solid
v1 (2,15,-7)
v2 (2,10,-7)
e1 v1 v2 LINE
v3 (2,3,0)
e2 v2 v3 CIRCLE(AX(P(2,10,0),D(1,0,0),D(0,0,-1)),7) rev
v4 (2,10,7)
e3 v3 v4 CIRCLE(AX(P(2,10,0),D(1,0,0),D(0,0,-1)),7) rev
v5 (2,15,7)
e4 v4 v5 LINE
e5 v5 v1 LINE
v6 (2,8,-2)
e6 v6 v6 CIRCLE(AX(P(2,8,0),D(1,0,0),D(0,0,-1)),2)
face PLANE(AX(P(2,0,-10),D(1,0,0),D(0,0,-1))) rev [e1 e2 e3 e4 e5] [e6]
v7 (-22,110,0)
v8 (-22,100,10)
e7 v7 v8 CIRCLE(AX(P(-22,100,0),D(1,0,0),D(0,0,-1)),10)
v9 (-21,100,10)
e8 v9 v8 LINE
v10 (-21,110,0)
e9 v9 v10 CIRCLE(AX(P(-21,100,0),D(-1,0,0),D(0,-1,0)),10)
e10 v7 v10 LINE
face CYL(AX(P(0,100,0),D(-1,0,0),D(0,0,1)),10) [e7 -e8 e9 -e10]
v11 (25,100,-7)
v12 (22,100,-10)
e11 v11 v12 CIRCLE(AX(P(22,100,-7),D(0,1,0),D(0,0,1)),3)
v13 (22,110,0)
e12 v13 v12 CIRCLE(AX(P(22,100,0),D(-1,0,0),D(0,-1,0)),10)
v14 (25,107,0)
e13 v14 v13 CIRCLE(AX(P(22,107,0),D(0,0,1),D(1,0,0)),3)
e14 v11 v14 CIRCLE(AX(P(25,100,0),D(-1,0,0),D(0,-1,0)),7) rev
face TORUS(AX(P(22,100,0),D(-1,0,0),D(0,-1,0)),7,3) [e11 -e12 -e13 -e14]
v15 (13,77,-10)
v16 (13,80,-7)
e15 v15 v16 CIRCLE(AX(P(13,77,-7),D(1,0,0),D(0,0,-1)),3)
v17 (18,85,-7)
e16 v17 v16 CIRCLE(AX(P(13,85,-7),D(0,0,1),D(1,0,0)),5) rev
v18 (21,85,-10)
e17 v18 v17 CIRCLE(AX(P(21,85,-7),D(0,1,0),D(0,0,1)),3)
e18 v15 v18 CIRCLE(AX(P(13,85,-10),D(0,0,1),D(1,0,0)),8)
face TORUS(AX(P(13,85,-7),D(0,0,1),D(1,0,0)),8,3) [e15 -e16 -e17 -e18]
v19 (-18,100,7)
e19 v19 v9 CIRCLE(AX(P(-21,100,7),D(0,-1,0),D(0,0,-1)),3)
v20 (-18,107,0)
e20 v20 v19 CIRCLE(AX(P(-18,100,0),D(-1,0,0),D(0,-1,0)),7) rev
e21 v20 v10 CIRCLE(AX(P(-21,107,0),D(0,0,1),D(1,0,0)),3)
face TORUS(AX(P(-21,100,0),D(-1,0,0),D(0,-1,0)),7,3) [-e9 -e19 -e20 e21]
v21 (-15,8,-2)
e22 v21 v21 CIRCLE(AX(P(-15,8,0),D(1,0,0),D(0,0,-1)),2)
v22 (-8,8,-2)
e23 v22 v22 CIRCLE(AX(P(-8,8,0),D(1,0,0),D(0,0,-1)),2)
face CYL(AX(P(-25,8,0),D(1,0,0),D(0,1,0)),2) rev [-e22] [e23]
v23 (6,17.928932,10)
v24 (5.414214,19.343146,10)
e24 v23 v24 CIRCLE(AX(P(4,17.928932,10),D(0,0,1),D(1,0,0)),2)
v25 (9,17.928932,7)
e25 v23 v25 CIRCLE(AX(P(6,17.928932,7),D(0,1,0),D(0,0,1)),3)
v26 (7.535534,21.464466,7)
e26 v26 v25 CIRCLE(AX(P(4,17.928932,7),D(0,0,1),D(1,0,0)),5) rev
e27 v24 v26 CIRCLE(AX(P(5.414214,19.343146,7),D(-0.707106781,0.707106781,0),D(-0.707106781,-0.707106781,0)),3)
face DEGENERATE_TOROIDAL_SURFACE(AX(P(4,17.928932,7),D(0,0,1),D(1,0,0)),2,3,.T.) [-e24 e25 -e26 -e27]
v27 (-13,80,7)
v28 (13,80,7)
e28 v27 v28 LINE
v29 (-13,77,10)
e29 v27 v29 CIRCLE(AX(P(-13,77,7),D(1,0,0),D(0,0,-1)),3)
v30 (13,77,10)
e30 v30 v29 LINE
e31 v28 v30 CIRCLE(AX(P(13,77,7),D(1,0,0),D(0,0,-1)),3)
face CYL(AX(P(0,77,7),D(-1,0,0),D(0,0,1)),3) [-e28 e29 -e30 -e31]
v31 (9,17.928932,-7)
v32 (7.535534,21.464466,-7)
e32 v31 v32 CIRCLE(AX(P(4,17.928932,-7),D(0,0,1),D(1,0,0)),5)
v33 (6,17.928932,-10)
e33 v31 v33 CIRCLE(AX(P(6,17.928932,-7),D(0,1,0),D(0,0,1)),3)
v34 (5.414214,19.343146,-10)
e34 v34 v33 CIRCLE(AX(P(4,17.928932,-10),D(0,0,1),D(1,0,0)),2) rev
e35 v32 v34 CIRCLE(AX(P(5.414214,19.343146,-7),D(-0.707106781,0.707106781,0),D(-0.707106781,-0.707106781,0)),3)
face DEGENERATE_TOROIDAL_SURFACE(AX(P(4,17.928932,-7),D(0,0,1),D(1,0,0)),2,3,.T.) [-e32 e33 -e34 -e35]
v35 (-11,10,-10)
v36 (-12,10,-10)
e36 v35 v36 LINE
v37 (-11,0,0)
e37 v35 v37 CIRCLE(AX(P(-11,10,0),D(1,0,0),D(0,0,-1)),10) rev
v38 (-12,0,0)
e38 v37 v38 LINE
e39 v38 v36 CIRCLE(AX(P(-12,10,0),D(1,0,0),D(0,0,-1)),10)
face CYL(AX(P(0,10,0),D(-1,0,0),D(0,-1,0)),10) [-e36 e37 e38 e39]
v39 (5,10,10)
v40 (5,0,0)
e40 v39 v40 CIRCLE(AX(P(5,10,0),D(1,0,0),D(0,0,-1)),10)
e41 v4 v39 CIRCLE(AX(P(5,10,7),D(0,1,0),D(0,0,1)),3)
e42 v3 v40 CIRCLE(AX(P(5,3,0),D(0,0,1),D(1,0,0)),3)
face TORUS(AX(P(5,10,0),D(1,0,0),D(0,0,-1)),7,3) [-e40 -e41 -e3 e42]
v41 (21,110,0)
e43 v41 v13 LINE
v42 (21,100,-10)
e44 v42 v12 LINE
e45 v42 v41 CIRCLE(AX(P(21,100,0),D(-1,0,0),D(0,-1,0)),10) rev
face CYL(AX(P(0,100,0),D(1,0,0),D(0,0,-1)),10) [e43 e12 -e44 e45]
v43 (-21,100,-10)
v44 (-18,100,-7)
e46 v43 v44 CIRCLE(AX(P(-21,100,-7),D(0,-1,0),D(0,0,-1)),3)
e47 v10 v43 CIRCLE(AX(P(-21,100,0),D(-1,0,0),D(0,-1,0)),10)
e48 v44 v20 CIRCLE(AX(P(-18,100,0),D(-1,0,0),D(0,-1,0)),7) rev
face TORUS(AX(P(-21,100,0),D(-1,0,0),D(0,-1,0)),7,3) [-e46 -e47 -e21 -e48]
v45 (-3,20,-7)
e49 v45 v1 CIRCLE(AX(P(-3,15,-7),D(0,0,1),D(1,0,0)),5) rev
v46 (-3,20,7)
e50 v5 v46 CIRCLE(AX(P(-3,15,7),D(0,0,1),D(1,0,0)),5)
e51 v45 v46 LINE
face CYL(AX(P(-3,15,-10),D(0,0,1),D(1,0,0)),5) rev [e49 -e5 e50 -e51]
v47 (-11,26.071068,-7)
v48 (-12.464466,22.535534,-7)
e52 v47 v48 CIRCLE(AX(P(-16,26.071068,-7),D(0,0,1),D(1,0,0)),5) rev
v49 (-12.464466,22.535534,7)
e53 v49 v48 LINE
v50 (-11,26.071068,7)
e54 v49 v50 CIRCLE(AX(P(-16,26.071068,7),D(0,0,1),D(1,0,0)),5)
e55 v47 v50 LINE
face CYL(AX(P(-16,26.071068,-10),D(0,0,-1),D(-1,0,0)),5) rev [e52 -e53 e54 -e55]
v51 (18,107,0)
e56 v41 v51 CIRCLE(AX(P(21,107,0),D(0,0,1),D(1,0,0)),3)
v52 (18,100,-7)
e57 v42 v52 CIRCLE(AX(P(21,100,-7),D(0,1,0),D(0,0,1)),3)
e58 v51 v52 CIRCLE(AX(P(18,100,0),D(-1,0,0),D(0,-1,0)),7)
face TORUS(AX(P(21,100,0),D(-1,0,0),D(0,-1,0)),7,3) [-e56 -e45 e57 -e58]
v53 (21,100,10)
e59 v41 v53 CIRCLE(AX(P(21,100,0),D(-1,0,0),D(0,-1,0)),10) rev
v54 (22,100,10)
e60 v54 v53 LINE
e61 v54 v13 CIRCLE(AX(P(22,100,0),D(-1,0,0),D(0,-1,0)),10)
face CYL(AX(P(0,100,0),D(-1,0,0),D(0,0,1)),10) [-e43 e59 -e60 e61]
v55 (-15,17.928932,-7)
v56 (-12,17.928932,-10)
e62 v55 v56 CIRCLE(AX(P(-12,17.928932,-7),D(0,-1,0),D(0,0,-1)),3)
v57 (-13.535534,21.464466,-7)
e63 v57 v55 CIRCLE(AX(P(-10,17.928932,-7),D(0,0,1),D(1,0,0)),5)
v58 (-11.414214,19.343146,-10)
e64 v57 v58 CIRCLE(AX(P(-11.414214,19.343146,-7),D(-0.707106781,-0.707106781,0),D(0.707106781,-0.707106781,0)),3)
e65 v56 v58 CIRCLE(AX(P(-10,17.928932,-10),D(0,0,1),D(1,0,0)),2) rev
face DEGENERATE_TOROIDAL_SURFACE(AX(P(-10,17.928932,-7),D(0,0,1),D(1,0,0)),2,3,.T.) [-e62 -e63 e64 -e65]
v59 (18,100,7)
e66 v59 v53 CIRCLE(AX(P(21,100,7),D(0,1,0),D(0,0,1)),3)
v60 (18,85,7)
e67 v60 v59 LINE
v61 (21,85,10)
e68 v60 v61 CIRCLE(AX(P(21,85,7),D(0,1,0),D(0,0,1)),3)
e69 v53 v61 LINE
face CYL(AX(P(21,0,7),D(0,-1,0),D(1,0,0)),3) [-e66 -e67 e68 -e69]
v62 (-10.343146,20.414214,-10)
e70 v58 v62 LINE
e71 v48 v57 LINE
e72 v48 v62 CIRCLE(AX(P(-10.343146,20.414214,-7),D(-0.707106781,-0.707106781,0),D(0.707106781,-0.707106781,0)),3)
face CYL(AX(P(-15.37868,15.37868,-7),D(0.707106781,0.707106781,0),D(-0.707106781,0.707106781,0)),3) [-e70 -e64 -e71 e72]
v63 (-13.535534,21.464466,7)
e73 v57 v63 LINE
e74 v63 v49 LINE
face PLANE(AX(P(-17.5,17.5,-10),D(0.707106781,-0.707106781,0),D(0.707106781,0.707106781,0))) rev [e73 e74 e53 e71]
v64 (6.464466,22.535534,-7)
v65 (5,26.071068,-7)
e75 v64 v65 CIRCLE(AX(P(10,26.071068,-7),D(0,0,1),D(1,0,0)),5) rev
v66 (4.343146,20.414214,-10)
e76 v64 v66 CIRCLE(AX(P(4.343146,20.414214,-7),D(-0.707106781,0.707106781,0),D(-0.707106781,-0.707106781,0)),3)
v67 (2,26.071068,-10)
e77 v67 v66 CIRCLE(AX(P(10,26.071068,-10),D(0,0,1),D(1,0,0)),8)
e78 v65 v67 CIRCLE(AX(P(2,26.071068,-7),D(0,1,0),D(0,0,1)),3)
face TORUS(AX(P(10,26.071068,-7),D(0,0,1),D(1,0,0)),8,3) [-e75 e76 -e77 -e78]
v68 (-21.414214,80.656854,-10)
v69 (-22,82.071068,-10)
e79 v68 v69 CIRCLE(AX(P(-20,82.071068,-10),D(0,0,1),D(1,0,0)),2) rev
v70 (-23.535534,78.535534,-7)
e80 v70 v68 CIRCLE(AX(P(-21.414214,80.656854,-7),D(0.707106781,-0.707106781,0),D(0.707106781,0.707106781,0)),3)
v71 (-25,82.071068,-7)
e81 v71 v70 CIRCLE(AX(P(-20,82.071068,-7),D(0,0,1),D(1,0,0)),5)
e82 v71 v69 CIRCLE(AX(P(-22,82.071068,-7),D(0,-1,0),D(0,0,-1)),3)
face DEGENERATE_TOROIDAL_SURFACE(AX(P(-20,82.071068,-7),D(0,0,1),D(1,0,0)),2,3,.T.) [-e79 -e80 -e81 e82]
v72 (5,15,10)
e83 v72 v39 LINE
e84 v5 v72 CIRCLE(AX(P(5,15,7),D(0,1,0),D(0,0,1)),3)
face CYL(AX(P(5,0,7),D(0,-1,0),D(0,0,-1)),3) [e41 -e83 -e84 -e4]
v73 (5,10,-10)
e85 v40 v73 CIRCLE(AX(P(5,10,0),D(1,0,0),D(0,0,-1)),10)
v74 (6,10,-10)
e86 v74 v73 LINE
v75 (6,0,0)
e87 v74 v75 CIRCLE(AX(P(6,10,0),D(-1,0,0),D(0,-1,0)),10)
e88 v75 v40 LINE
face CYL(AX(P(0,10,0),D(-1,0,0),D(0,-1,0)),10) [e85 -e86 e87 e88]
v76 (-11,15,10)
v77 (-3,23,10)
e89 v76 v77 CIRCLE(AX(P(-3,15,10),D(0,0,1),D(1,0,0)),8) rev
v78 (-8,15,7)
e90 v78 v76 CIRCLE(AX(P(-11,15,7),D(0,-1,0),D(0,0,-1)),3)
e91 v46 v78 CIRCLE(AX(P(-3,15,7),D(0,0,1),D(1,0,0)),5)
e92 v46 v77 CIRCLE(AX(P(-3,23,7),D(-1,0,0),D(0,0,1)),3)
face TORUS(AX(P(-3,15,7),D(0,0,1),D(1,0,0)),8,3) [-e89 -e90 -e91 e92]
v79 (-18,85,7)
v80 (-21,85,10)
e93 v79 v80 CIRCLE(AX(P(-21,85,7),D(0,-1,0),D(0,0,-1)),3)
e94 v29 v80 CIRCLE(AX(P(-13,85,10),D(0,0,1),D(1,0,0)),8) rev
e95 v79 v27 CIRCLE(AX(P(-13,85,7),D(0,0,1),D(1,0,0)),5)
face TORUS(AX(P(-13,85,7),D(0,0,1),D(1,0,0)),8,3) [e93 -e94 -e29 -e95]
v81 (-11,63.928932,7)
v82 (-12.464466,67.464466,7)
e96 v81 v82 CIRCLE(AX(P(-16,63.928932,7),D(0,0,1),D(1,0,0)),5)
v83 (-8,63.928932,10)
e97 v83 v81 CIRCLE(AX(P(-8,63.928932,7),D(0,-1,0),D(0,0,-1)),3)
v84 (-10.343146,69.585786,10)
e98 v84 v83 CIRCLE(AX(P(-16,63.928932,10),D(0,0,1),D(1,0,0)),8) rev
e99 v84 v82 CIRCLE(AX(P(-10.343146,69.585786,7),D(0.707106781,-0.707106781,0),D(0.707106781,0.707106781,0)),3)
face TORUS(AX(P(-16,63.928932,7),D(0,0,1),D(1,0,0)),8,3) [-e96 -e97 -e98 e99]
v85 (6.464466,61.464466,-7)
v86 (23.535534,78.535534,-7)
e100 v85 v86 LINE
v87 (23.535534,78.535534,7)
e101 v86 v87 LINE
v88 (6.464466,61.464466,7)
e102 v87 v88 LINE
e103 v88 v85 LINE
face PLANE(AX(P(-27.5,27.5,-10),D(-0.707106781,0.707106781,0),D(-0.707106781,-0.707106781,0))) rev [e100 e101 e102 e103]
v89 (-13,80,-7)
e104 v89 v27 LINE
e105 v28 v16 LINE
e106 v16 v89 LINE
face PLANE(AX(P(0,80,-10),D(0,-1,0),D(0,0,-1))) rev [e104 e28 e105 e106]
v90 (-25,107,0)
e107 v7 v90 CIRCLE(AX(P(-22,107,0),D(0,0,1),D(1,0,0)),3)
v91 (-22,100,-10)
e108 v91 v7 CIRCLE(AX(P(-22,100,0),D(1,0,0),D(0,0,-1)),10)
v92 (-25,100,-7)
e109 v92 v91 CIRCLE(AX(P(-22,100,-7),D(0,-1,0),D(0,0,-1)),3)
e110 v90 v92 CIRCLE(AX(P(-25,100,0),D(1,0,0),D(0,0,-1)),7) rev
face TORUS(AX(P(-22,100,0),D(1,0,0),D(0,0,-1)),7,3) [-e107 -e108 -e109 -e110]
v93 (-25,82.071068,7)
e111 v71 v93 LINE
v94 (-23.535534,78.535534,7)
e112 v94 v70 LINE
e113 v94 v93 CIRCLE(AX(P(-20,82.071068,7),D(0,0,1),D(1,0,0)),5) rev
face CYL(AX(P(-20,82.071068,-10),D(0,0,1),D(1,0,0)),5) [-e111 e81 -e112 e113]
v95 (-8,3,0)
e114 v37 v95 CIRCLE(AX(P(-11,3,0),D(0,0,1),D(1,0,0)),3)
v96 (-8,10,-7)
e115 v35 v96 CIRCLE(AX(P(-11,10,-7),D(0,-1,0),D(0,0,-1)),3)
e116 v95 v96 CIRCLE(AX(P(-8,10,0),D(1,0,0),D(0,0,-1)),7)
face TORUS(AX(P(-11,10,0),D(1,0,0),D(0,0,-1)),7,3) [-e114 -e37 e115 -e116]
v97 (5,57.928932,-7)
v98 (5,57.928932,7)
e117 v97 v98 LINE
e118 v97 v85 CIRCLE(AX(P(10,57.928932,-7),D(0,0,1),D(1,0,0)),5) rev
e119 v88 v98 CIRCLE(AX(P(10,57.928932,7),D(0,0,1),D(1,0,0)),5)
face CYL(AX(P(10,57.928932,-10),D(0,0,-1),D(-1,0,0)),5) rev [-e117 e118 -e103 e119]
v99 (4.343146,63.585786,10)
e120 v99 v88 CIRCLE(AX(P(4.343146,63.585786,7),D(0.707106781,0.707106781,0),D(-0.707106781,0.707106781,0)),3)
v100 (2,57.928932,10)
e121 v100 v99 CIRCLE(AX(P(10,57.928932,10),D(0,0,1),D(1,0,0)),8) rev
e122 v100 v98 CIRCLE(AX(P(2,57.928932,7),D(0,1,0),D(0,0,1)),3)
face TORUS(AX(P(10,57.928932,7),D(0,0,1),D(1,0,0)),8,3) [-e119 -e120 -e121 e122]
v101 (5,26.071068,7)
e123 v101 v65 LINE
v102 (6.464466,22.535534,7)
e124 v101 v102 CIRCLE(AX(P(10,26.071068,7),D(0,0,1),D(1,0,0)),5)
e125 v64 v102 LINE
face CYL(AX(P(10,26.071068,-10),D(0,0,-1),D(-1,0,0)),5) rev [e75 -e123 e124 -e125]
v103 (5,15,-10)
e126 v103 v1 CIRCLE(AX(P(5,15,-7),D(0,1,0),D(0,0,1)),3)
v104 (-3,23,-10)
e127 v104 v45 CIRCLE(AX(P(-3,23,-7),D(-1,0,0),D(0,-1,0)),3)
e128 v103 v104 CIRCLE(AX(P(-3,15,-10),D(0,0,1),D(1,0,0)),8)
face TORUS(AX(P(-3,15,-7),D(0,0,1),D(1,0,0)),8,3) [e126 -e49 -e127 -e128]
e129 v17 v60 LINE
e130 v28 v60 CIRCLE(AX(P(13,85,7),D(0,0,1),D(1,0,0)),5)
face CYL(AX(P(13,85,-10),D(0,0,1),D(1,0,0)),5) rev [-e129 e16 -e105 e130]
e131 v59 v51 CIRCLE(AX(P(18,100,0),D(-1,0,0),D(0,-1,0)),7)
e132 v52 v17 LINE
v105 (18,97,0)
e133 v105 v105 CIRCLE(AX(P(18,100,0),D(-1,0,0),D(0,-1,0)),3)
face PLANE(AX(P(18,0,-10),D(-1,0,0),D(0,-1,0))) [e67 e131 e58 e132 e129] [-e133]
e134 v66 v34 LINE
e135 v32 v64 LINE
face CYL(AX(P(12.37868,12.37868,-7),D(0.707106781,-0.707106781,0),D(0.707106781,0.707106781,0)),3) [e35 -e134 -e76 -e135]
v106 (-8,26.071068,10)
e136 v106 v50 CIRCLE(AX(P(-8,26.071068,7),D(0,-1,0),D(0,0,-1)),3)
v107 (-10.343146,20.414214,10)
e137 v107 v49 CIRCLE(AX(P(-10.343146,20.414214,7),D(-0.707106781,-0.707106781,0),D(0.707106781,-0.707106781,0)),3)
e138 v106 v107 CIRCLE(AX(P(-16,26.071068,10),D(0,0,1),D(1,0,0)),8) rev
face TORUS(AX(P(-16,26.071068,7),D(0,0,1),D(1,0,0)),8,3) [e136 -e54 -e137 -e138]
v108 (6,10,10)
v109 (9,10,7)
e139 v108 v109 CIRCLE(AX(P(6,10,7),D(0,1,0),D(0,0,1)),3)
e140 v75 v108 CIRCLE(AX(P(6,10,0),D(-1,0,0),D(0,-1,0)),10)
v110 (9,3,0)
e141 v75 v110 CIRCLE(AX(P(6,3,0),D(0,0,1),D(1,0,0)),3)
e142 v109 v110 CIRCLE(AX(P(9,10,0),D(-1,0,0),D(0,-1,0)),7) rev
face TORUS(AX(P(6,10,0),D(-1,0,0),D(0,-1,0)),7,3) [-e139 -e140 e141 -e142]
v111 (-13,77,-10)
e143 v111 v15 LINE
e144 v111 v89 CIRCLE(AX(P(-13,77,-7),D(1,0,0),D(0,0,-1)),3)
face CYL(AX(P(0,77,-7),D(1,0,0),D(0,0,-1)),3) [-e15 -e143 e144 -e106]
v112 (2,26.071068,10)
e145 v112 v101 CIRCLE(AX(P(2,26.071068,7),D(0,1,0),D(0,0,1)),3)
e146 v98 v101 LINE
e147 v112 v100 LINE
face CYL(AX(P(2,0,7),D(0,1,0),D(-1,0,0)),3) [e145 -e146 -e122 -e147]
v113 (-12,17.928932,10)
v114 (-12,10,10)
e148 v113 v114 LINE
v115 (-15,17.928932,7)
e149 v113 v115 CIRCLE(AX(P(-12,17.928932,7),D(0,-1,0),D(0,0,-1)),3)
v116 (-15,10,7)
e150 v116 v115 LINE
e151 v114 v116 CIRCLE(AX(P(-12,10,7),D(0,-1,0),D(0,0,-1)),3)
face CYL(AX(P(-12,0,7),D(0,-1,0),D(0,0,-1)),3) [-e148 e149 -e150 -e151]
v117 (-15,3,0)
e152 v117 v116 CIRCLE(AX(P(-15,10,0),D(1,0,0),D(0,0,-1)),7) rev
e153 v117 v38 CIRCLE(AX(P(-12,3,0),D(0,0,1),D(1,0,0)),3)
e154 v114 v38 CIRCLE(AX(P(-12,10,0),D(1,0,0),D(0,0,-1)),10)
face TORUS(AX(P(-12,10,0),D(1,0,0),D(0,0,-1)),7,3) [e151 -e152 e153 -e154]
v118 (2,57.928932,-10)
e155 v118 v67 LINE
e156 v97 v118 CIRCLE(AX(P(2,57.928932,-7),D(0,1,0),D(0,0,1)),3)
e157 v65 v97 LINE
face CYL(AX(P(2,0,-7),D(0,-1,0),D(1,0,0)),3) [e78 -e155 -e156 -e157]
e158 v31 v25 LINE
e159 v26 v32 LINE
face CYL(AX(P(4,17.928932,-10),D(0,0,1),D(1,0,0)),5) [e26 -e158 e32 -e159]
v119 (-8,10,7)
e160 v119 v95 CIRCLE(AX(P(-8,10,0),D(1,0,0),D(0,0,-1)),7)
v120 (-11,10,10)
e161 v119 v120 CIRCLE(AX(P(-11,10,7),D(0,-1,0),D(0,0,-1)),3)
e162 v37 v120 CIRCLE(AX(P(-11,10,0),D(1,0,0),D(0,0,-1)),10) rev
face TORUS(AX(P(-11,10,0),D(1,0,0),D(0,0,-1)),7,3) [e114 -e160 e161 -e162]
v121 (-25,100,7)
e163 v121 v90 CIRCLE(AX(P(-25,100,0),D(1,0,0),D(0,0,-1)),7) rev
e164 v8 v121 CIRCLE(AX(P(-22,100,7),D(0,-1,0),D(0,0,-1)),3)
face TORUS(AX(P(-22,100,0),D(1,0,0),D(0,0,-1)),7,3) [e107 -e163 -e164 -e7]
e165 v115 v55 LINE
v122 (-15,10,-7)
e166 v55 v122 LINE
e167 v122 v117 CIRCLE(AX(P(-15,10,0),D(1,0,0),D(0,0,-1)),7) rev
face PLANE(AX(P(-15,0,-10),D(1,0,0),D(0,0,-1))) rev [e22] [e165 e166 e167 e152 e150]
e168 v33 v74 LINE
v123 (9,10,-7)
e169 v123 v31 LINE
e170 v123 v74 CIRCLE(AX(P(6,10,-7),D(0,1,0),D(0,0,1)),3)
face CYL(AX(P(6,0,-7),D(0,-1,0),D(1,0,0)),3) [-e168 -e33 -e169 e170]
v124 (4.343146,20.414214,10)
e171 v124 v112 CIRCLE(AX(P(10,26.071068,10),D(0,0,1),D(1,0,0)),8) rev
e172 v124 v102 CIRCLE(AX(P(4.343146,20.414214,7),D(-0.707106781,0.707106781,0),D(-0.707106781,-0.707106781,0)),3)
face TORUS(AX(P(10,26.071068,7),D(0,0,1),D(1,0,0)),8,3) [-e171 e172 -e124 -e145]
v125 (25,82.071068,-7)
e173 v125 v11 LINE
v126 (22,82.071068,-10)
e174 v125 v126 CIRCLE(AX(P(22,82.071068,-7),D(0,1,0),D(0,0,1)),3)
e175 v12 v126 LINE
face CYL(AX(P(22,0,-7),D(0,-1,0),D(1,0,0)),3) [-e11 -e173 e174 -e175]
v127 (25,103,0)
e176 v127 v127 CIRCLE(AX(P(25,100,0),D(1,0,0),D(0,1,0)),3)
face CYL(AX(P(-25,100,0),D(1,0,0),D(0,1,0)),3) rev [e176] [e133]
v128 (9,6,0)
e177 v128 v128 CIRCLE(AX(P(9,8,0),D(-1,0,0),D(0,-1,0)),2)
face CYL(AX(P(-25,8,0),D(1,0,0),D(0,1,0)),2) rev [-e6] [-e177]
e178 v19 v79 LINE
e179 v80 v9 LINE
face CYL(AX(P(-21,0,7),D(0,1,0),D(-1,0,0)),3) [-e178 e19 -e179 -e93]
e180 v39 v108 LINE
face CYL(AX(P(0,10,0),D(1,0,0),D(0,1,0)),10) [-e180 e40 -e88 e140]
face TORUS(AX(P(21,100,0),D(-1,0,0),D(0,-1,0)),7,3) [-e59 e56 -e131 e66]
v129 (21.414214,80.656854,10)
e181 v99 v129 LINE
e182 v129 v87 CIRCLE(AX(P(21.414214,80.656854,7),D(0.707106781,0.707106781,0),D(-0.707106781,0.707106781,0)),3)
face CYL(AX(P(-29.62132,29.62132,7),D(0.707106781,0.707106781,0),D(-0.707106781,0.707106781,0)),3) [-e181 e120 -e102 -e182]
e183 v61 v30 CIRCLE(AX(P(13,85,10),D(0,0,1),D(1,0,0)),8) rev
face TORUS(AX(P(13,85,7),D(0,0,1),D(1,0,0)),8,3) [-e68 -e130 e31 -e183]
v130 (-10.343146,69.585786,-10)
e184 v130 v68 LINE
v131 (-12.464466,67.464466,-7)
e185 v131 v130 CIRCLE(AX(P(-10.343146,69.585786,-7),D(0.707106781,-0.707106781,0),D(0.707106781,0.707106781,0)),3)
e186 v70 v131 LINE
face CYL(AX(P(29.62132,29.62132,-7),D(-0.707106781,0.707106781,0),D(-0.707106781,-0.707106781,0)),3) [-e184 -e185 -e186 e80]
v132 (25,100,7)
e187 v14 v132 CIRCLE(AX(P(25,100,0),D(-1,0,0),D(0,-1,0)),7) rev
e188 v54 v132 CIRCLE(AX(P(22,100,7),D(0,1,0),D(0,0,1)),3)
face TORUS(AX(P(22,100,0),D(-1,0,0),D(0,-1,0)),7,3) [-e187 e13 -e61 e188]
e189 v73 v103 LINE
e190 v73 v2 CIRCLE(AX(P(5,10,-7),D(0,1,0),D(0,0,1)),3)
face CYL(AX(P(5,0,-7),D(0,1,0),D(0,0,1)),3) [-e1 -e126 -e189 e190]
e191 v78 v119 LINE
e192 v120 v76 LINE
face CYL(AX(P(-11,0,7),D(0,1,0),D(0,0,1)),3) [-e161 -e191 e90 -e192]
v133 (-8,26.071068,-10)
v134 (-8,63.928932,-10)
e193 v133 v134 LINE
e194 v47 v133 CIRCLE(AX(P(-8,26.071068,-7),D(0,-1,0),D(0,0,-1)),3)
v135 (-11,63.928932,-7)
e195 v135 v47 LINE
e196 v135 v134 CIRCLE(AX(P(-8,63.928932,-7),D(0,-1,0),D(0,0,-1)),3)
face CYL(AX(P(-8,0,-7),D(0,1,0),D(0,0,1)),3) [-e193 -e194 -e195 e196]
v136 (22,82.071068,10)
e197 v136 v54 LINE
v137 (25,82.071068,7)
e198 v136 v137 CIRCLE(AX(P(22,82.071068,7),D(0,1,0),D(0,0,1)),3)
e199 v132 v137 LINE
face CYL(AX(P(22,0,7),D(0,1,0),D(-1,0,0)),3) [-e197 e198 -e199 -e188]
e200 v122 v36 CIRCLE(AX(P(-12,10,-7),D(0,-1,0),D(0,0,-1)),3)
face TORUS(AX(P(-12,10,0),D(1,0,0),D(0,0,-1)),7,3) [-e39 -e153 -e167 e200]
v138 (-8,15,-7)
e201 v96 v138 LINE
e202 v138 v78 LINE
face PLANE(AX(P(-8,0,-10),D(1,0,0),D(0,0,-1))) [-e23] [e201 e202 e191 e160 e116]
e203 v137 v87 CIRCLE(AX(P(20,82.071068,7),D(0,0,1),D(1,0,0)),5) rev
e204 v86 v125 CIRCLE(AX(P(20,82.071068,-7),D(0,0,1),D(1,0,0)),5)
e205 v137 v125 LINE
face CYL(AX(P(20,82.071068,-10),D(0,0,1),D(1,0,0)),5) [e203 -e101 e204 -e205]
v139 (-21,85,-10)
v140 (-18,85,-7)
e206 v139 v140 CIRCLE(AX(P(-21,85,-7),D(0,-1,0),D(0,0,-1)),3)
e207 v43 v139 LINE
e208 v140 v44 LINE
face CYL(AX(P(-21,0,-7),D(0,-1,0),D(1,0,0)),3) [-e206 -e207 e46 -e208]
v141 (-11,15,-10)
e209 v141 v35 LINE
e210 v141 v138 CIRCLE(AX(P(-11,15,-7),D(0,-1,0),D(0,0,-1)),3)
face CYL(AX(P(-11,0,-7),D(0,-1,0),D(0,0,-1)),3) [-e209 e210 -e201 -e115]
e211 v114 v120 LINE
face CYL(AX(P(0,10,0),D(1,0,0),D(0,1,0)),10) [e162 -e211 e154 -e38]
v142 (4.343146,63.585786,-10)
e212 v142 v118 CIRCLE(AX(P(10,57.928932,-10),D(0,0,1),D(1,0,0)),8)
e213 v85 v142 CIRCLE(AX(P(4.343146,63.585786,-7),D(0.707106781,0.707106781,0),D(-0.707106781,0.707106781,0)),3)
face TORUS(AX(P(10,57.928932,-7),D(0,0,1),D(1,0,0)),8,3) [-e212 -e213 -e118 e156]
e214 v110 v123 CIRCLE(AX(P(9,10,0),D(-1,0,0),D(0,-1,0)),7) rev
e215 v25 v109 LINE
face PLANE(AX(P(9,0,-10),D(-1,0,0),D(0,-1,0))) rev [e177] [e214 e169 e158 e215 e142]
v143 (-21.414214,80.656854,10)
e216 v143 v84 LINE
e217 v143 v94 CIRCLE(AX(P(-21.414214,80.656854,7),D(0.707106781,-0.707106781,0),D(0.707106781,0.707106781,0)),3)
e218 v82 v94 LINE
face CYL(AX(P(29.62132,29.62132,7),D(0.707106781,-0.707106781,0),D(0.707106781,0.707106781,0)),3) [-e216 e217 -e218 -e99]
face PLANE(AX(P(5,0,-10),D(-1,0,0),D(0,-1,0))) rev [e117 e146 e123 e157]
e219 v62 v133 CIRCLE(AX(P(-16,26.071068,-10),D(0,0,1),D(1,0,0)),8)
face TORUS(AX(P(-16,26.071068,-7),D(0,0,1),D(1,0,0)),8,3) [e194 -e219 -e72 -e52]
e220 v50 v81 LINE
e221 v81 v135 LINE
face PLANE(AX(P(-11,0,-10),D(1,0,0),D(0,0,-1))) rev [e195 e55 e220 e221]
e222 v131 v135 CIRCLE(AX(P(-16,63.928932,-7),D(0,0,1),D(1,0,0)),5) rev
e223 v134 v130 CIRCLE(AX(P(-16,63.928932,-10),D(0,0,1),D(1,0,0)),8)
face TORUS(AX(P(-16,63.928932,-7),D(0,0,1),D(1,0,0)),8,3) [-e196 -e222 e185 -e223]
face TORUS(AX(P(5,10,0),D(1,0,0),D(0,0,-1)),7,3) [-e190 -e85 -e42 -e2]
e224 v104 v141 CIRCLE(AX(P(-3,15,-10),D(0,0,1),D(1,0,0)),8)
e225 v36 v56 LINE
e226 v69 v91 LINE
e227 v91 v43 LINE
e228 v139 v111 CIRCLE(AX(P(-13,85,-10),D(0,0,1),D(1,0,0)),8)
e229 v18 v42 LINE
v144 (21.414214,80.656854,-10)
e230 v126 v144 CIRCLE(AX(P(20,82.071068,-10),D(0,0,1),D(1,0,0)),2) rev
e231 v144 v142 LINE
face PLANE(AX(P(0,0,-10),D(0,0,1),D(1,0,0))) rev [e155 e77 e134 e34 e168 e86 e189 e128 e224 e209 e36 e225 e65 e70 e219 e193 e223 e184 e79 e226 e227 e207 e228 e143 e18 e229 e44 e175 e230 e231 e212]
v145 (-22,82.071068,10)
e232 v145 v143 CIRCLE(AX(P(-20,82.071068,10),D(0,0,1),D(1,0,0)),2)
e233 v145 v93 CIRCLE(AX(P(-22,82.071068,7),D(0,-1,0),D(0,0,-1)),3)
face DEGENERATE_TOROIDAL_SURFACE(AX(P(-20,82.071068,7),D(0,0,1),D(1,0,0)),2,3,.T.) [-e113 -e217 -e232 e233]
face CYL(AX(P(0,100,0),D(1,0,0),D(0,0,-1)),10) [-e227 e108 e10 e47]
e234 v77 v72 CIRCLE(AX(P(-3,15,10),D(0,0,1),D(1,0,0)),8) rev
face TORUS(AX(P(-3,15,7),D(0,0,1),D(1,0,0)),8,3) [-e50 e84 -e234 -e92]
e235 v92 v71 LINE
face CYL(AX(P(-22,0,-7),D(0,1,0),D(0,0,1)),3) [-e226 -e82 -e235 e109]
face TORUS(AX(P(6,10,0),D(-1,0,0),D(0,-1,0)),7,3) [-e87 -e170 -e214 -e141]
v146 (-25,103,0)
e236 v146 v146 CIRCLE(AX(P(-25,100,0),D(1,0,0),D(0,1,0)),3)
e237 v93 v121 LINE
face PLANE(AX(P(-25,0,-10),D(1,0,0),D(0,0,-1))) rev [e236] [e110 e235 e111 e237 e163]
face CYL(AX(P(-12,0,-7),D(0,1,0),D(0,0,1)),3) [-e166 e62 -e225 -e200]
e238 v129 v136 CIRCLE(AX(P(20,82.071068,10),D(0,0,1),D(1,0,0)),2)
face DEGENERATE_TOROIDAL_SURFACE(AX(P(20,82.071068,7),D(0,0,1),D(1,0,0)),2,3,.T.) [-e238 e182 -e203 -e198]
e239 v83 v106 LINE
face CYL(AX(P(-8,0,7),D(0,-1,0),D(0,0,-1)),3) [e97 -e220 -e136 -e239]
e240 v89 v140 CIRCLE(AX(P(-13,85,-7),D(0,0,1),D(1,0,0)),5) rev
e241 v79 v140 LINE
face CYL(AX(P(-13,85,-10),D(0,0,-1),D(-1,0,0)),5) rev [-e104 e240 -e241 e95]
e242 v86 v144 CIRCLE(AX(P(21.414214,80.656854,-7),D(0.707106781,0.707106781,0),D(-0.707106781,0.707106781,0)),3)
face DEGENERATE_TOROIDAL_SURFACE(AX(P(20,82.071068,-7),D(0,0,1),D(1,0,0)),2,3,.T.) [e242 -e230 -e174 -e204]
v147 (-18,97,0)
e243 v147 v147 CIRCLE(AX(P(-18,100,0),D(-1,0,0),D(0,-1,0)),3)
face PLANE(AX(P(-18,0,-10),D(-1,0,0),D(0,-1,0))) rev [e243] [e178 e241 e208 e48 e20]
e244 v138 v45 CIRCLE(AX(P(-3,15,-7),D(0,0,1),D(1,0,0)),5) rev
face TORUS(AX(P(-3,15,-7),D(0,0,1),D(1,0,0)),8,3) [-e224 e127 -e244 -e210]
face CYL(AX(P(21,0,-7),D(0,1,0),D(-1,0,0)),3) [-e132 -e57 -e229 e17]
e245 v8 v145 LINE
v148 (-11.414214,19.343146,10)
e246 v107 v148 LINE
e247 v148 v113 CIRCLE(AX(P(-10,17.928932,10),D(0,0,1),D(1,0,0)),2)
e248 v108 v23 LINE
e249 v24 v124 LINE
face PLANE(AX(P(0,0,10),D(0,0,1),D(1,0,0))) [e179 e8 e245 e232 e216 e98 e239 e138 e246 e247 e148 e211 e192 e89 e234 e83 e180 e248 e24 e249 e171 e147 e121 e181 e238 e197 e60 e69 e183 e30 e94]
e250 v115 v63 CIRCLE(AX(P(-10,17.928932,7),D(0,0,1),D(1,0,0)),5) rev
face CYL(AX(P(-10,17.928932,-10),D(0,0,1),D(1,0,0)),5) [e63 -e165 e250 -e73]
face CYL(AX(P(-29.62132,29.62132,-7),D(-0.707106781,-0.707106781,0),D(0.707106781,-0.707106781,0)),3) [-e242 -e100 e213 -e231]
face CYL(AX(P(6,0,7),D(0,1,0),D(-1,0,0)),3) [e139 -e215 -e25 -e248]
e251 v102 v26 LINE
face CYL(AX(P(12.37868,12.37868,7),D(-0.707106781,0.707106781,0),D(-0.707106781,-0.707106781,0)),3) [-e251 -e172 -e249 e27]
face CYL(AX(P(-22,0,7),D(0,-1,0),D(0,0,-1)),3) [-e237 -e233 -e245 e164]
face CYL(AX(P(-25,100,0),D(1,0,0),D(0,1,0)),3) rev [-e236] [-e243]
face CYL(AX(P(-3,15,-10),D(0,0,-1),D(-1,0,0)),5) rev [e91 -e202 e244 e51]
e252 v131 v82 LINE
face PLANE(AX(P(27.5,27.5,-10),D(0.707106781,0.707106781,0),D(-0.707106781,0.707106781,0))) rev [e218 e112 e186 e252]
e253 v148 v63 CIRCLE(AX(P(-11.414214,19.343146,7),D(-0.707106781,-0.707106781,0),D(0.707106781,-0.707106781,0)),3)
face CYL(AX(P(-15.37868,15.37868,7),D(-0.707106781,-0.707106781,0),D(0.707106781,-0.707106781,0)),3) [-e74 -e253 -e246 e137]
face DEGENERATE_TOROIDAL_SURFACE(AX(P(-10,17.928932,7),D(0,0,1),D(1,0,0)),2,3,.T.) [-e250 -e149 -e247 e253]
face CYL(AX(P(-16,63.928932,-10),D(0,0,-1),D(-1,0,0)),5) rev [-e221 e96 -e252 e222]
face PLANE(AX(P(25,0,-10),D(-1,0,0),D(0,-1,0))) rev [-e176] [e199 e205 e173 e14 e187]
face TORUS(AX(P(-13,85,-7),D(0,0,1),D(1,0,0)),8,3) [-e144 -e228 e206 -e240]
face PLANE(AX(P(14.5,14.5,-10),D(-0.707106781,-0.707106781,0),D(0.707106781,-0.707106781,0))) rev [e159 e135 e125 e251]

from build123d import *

# Parameters (mm, degrees)
BOSS_EXTRUDE1_DEPTH      = 10
BOSS_EXTRUDE1_DEPTH_BACK = 10
SKETCH2_R                = 3
SKETCH2_R_2              = 2
CUT_EXTRUDE1_DEPTH       = 50
FILLET4_R                = 10
FILLET5_R                = 5
FILLET6_R                = 5
FILLET9_R                = 10
FILLET10_R               = 5
FILLET11_R               = 3


with BuildPart() as part:
    # Sketch1 → Boss-Extrude1 (new, two sides: drawn at the far end of the back side and taken through both)
    with BuildSketch(Plane.XY.offset(-BOSS_EXTRUDE1_DEPTH_BACK)):
        Polygon((-15, 20), (-15, 0), (-8, 0), (-8, 20), (2, 20), (2, 0), (9, 0), (9, 20), (5, 24), (5, 60), (25, 80), (25, 110), (18, 110), (18, 80), (-18, 80), (-18, 110), (-25, 110), (-25, 80), (-11, 66), (-11, 24), align=None)
    extrude(amount=BOSS_EXTRUDE1_DEPTH + BOSS_EXTRUDE1_DEPTH_BACK)

    # Sketch2 → Cut-Extrude1 (cut)
    with BuildSketch(Plane(origin=(25, 0, 0), x_dir=(0, 0, -1), z_dir=(1, 0, 0))):
        with Locations(Location((0, 100, 0), (0, 0, 90))):
            Circle(SKETCH2_R)
        with Locations((0, 8)):
            Circle(SKETCH2_R_2)
    extrude(amount=-CUT_EXTRUDE1_DEPTH, mode=Mode.SUBTRACT)

    # Fillet4
    fillet4_edges = [part.edges().sort_by_distance(p)[0] for p in [
        (-21.5, 110, -10),
        (-21.5, 110, 10),
        (21.5, 110, -10),
        (21.5, 110, 10),
    ]]
    fillet(fillet4_edges, radius=FILLET4_R - 0.0001)  # a hair under: the kernel refuses the full size

    # Fillet5
    fillet5_edges = [part.edges().sort_by_distance(p)[0] for p in [
        (-18, 80, 0),
        (18, 80, 0),
    ]]
    fillet(fillet5_edges, radius=FILLET5_R)

    # Fillet6
    fillet6_edges = [part.edges().sort_by_distance(p)[0] for p in [
        (-15, 20, 0),
        (-11, 24, 0),
        (-11, 66, 0),
        (-25, 80, 0),
        (25, 80, 0),
        (5, 60, 0),
        (5, 24, 0),
        (9, 20, 0),
    ]]
    fillet(fillet6_edges, radius=FILLET6_R)

    # Fillet9
    fillet9_edges = [part.edges().sort_by_distance(p)[0] for p in [
        (-11.5, 0, -10),
        (-11.5, 0, 10),
        (5.5, 0, -10),
        (5.5, 0, 10),
    ]]
    fillet(fillet9_edges, radius=FILLET9_R - 0.0001)  # a hair under: the kernel refuses the full size

    # Fillet10
    fillet10_edges = [part.edges().sort_by_distance(p)[0] for p in [
        (-8, 20, 0),
        (2, 20, 0),
    ]]
    fillet(fillet10_edges, radius=FILLET10_R - 0.0001)  # a hair under: the kernel refuses the full size

    # Fillet11
    fillet11_edges = [part.edges().sort_by_distance(p)[0] for p in [
        (18, 107.071097101, 7.071097101),
        (18, 107.071097101, -7.071097101),
        (18, 92.50005, -10),
        (16.535533906, 81.464466094, -10),
        (0, 80, -10),
        (-16.535533906, 81.464466094, -10),
        (-18, 92.50005, -10),
        (-18, 107.071097101, -7.071097101),
        (-18, 107.071097101, 7.071097101),
        (25, 107.071097101, 7.071097101),
        (25, 107.071097101, -7.071097101),
        (25, 91.035583906, -10),
        (24.619397663, 80.15765065, -10),
        (15, 70, -10),
        (5.380602337, 59.84234935, -10),
        (5, 42, -10),
        (5.380602337, 24.15765065, -10),
        (7, 22, -10),
        (8.619397663, 19.84234935, -10),
        (9, 13.964416094, -10),
        (9, 2.928902899, -7.071097101),
        (9, 2.928902899, 7.071097101),
        (-8, 2.928902899, 7.071097101),
        (-8, 2.928902899, -7.071097101),
        (-8, 12.5, -10),
        (-6.535563195, 18.535563195, -10),
        (0.535563195, 18.535563195, -10),
        (2, 12.5, -10),
        (2, 2.928902899, -7.071097101),
        (2, 2.928902899, 7.071097101),
        (-15, 2.928902899, 7.071097101),
        (-15, 2.928902899, -7.071097101),
        (-15, 13.964416094, -10),
        (-14.619397663, 19.84234935, -10),
        (-13, 22, -10),
        (-11.380602337, 24.15765065, -10),
        (-11, 45, -10),
        (-11.380602337, 65.84234935, -10),
        (-18, 73, -10),
        (-24.619397663, 80.15765065, -10),
        (-25, 91.035583906, -10),
        (-25, 107.071097101, -7.071097101),
        (-25, 107.071097101, 7.071097101),
        (-14.619397663, 19.84234935, 10),
        (-13, 22, 10),
        (-11.380602337, 24.15765065, 10),
        (-11, 45, 10),
        (-11.380602337, 65.84234935, 10),
        (-18, 73, 10),
        (-24.619397663, 80.15765065, 10),
        (-25, 91.035583906, 10),
        (-18, 92.50005, 10),
        (-16.535533906, 81.464466094, 10),
        (0, 80, 10),
        (16.535533906, 81.464466094, 10),
        (18, 92.50005, 10),
        (25, 91.035583906, 10),
        (24.619397663, 80.15765065, 10),
        (15, 70, 10),
        (5.380602337, 59.84234935, 10),
        (5, 42, 10),
        (5.380602337, 24.15765065, 10),
        (7, 22, 10),
        (8.619397663, 19.84234935, 10),
        (9, 13.964416094, 10),
        (2, 12.5, 10),
        (0.535563195, 18.535563195, 10),
        (-6.535563195, 18.535563195, 10),
        (-8, 12.5, 10),
        (-15, 13.964416094, 10),
    ]]
    fillet(fillet11_edges, radius=FILLET11_R)


solid = part.part
